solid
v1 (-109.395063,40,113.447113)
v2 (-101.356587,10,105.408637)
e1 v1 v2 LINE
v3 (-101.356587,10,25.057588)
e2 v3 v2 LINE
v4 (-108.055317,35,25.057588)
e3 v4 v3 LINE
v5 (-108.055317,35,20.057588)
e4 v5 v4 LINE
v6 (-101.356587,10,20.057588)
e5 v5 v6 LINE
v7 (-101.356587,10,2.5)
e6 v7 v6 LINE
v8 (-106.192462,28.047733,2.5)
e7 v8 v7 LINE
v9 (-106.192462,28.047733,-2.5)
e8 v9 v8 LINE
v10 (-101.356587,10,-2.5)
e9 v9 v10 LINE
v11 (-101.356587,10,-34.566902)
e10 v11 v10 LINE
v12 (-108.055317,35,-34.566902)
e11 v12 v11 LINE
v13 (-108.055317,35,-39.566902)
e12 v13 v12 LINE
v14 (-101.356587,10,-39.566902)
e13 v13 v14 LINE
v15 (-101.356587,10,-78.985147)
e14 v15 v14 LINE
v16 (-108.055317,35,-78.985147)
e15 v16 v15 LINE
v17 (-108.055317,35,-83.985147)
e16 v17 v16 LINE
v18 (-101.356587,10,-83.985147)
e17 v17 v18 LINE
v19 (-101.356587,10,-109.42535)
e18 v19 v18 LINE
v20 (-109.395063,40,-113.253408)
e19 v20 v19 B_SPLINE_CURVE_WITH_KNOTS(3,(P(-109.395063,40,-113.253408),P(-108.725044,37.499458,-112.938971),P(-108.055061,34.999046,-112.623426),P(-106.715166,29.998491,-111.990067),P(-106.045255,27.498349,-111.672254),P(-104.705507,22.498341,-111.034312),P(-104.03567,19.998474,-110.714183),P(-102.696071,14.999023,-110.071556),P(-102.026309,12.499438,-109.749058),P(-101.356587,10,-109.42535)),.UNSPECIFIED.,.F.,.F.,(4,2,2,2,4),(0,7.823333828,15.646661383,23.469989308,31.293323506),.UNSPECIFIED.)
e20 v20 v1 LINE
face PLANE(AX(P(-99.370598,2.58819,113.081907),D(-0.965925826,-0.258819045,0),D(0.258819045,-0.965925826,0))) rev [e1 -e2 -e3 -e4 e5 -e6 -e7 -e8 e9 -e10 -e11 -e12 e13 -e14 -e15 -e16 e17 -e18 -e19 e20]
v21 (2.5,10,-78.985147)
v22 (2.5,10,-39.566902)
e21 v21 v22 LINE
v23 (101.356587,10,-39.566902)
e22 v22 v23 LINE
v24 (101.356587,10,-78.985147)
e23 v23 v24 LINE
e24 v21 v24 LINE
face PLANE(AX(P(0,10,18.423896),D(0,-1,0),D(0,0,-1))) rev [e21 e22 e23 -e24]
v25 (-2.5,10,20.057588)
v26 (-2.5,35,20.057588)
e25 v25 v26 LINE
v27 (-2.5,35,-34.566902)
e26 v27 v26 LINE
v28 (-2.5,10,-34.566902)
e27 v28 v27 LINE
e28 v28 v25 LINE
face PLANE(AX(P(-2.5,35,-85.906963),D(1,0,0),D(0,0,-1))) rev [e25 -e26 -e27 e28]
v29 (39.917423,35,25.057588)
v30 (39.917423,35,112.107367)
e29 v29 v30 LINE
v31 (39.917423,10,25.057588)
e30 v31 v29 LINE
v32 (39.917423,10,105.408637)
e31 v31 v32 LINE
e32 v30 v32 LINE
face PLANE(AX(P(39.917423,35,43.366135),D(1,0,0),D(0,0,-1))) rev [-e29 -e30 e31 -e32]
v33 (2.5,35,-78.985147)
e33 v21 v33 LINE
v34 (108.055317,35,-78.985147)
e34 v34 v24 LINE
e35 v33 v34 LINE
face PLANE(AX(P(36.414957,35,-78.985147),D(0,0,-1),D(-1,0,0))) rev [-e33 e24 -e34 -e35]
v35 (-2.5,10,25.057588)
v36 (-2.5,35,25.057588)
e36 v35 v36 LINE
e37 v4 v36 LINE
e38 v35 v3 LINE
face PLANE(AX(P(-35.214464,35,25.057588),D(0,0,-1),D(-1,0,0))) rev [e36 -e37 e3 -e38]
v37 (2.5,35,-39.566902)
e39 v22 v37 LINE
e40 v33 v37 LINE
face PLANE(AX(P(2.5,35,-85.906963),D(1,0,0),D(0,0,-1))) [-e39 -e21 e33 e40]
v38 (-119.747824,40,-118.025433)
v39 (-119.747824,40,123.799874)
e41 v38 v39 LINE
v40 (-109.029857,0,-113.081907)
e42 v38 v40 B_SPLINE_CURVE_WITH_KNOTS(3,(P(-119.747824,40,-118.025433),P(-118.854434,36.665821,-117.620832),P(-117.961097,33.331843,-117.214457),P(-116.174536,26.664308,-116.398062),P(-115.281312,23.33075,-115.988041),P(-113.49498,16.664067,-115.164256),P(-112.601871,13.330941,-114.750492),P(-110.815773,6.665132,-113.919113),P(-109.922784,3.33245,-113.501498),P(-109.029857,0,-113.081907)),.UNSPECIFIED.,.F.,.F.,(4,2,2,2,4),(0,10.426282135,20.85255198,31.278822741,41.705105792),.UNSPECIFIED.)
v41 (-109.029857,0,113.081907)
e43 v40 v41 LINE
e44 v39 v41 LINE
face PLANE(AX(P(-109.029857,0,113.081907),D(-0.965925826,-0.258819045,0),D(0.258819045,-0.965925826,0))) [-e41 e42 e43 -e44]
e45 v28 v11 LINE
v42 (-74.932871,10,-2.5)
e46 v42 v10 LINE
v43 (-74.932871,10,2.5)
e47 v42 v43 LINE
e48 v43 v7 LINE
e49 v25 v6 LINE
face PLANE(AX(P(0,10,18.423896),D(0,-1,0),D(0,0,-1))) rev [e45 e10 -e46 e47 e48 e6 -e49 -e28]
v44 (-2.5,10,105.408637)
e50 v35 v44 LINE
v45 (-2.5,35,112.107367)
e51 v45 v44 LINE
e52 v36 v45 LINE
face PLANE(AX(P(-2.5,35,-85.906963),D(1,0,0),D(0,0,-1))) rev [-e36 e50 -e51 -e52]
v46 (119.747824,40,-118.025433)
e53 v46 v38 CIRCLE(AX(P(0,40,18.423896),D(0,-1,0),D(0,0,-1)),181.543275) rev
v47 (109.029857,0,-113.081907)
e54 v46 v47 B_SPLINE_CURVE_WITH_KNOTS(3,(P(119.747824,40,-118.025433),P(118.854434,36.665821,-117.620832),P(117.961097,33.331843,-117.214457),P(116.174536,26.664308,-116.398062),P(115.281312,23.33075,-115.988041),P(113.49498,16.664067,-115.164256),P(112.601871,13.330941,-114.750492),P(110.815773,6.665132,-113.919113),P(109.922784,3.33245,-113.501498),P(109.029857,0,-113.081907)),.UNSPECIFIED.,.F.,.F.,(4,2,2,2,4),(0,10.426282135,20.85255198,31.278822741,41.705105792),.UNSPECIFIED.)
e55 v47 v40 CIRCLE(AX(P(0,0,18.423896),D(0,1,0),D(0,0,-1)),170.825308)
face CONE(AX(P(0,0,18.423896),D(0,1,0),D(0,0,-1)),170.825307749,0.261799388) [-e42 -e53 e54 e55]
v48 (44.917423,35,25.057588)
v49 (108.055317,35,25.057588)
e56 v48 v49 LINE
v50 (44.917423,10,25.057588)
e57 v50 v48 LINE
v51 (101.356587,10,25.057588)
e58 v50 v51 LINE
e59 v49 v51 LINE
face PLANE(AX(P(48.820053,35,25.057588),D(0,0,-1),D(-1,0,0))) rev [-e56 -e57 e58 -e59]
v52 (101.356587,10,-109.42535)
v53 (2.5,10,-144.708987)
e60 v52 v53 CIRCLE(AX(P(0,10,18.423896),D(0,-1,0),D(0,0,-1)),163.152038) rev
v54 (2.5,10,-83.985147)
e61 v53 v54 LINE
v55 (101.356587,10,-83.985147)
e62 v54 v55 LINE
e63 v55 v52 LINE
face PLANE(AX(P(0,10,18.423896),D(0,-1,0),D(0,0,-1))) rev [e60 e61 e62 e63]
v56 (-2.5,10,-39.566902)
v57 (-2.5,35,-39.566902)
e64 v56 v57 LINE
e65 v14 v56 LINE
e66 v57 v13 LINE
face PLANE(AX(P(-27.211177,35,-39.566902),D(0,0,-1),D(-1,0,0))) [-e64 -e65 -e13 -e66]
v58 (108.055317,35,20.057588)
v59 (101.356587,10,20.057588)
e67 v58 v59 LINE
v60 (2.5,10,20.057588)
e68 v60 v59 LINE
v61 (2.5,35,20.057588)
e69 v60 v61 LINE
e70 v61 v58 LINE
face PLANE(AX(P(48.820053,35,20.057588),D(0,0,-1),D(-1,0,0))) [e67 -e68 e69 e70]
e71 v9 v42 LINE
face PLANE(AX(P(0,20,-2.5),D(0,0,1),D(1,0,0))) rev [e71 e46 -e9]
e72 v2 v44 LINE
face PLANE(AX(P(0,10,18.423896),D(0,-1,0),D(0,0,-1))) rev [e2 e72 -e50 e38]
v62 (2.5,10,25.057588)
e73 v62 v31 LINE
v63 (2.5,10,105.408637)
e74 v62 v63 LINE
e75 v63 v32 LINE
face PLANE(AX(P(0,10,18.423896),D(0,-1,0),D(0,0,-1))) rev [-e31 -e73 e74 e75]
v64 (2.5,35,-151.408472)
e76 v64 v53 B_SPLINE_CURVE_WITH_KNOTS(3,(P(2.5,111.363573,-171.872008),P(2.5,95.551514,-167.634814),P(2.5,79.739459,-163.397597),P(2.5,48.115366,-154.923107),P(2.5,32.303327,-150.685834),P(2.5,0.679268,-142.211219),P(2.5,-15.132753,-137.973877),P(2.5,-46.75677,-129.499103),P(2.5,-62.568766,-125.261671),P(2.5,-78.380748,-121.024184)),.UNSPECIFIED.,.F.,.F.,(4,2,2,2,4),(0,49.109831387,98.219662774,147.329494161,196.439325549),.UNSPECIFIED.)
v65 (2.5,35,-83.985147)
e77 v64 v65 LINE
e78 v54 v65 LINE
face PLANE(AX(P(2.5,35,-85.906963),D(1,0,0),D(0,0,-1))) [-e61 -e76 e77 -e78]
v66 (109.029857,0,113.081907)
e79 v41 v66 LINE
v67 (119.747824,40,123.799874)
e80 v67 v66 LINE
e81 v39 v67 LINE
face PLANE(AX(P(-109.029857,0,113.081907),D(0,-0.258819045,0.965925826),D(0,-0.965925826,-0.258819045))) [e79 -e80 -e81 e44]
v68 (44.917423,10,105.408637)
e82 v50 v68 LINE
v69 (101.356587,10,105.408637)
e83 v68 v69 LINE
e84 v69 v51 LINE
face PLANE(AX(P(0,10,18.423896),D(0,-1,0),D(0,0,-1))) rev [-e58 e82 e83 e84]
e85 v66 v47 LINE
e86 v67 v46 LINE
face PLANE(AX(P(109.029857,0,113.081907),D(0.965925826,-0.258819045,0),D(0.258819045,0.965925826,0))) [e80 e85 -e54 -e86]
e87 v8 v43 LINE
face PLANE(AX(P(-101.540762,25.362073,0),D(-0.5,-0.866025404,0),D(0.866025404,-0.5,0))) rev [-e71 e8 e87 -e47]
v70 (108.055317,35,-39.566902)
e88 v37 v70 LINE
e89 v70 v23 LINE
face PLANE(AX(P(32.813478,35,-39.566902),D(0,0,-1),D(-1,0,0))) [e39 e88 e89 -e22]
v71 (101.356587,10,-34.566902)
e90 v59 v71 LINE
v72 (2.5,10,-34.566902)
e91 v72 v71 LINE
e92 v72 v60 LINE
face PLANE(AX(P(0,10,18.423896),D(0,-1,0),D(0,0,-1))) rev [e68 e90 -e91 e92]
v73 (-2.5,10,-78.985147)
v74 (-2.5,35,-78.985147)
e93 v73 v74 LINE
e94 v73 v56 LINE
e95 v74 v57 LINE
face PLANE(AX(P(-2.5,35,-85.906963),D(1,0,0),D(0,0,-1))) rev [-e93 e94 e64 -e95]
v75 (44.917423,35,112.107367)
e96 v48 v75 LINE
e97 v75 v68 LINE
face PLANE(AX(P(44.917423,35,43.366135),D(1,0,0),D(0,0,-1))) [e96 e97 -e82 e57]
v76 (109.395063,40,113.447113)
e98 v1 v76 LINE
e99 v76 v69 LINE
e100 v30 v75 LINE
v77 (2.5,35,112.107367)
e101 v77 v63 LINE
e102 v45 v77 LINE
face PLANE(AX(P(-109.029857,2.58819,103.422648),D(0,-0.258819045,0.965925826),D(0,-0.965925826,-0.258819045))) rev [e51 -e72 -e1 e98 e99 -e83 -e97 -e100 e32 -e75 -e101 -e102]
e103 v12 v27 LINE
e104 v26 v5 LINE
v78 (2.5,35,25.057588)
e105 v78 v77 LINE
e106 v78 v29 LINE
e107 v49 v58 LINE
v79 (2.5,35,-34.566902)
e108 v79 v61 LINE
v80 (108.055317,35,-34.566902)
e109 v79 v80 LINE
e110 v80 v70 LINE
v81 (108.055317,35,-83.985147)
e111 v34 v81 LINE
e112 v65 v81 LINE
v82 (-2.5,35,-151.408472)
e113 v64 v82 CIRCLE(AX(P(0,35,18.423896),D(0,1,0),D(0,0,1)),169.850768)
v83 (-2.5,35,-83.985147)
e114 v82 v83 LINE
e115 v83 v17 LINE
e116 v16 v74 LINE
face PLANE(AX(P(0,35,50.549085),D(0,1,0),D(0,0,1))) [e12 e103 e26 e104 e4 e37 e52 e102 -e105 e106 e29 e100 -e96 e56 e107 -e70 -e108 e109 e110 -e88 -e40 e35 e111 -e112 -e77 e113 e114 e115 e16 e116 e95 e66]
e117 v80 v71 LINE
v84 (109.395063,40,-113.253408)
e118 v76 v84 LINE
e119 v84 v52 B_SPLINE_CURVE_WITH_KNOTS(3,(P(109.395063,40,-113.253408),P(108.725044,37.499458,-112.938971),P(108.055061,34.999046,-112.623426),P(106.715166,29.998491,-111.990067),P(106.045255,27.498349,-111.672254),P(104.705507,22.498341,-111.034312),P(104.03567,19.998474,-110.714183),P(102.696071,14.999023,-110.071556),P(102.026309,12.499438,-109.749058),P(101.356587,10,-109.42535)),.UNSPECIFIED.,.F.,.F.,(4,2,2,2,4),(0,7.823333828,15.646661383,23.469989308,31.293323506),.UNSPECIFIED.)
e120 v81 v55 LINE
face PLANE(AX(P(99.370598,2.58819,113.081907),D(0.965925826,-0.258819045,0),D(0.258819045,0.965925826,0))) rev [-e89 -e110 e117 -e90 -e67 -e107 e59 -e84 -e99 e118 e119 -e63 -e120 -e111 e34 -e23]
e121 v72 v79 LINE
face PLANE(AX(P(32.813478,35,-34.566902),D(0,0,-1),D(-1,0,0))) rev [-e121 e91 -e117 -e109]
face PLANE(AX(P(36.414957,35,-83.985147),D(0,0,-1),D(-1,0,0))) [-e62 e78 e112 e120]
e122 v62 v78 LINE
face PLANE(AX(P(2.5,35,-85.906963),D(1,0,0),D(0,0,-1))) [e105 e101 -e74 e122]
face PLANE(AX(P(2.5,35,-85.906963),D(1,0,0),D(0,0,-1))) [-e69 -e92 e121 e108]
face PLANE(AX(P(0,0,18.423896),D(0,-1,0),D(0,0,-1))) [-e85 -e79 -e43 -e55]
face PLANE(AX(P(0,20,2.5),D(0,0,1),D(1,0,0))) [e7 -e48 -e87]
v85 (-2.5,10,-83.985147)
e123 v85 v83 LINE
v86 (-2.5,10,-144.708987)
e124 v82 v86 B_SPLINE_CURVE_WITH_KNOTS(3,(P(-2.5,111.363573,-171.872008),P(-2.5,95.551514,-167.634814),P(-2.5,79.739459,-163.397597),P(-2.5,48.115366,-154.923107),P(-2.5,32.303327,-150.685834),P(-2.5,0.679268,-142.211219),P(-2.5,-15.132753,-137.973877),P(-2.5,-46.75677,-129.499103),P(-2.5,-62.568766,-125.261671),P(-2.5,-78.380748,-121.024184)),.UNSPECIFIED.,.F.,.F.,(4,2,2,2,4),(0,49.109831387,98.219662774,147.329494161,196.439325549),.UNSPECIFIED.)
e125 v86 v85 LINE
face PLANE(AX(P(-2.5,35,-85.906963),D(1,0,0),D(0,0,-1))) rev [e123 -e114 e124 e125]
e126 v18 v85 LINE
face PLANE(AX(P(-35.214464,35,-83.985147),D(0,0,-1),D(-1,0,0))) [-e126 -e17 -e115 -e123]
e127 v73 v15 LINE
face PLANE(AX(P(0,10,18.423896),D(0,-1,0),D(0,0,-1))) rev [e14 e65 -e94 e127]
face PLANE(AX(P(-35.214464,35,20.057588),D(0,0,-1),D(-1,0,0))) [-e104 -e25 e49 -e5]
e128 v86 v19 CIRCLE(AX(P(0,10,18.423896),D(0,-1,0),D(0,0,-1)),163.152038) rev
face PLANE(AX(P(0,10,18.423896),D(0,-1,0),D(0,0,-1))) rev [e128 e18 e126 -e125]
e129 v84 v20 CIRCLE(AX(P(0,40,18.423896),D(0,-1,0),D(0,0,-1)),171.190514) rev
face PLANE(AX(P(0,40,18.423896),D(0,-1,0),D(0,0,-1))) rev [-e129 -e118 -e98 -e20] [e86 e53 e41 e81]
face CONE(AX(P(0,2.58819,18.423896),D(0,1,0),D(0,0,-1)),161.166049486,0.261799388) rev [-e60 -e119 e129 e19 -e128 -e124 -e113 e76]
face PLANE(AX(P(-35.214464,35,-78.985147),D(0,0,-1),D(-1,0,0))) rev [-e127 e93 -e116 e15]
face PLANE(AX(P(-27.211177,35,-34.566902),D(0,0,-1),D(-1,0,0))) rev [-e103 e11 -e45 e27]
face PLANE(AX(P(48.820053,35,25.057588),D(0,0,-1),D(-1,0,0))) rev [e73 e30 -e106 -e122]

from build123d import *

# Parameters (mm, degrees)
BOSS_EXTRUDE1_DEPTH = 40
BOSS_EXTRUDE1_DRAFT = -15
SHELL1_T            = -10
RIB7_REACH          = 207.359
SKETCH5_WALLS_W     = 5
SKETCH5_WALLS_H     = 549.174801164
SKETCH5_WALLS_W_2   = 496.753269208
SKETCH5_WALLS_H_2   = 5
SKETCH5_WALLS_W_3   = 472.743407243
SKETCH5_WALLS_W_4   = 484.34817386
RIB8_REACH          = 207.359
SKETCH6_WALLS_W     = 5
SKETCH6_WALLS_H     = 444.331737252
RIB9_REACH          = 208.27
SKETCH7_WALL_W      = 435.628467694
SKETCH7_WALL_H      = 5


with BuildPart() as part:
    # Sketch1 → Boss-Extrude1 (with draft: the straight prism first)
    with BuildSketch(Plane(origin=(0, 0, 0), x_dir=(1, 0, 0), z_dir=(0, 1, 0))):
        with BuildLine():
            Line((-109.029856613, -113.081906669), (109.029856613, -113.081906669))
            Line((109.029856613, -113.081906669), (109.029856613, 113.081906669))
            ThreePointArc((109.029856613, 113.081906669), (0, 152.401411753), (-109.029856613, 113.081906669))
            Line((-109.029856613, 113.081906669), (-109.029856613, -113.081906669))
        make_face()
    extrude(amount=BOSS_EXTRUDE1_DEPTH)
    # Boss-Extrude1: the draft: its side faces are tilted about the plane it starts from
    boss_extrude1_sides = [part.faces().sort_by_distance(p)[0] for p in [
        (0, 20, 113.081906669),
        (109.029856613, 20, 0),
        (0, 20, -152.401411753),
        (-109.029856613, 20, 0),
    ]]
    draft(boss_extrude1_sides, Plane(origin=(0, 0, 0), x_dir=(1, 0, 0), z_dir=(0, 1, 0)), BOSS_EXTRUDE1_DRAFT)

    # Shell1
    shell1_openings = [part.faces().sort_by_distance(p)[0] for p in [
        (0, 40, -12.878837242),
    ]]
    offset(amount=SHELL1_T, openings=shell1_openings, kind=Kind.INTERSECTION)

    # Sketch5 walls → Rib7 (add, up to next)
    with BuildSketch(Plane(origin=(0, 35, 0), x_dir=(1, 0, 0), z_dir=(0, 1, 0)), mode=Mode.PRIVATE) as rib7_sk1:
        with Locations((0, 17.67893893)):
            Rectangle(SKETCH5_WALLS_W, SKETCH5_WALLS_H)
    rib7_tool1 = extrude(rib7_sk1.sketch, amount=-RIB7_REACH, mode=Mode.PRIVATE) - part.part
    # Sketch5 walls → Rib7 (add, up to next)
    with BuildSketch(Plane(origin=(0, 35, 0), x_dir=(1, 0, 0), z_dir=(0, 1, 0)), mode=Mode.PRIVATE) as rib7_sk2:
        with Locations((6.802794223, -22.557588079)):
            Rectangle(SKETCH5_WALLS_W_2, SKETCH5_WALLS_H_2)
    rib7_tool2 = extrude(rib7_sk2.sketch, amount=-RIB7_REACH, mode=Mode.PRIVATE) - part.part
    # Sketch5 walls → Rib7 (add, up to next)
    with BuildSketch(Plane(origin=(0, 35, 0), x_dir=(1, 0, 0), z_dir=(0, 1, 0)), mode=Mode.PRIVATE) as rib7_sk3:
        with Locations((2.801150562, 37.066902466)):
            Rectangle(SKETCH5_WALLS_W_3, SKETCH5_WALLS_H_2)
    rib7_tool3 = extrude(rib7_sk3.sketch, amount=-RIB7_REACH, mode=Mode.PRIVATE) - part.part
    # Sketch5 walls → Rib7 (add, up to next)
    with BuildSketch(Plane(origin=(0, 35, 0), x_dir=(1, 0, 0), z_dir=(0, 1, 0)), mode=Mode.PRIVATE) as rib7_sk4:
        with Locations((0.600246549, 81.485147101)):
            Rectangle(SKETCH5_WALLS_W_4, SKETCH5_WALLS_H_2)
    rib7_tool4 = extrude(rib7_sk4.sketch, amount=-RIB7_REACH, mode=Mode.PRIVATE) - part.part
    add(rib7_tool1.solids().sort_by_distance((0, 35, -17.67893893))[0])
    add(rib7_tool2.solids().sort_by_distance((6.802794223, 35, 22.557588079))[0])
    add(rib7_tool3.solids().sort_by_distance((2.801150563, 35, -37.066902466))[0])
    add(rib7_tool4.solids().sort_by_distance((0.600246549, 35, -81.485147101))[0])

    # Sketch6 walls → Rib8 (add, up to next)
    with BuildSketch(Plane(origin=(0, 35, 0), x_dir=(1, 0, 0), z_dir=(0, 1, 0)), mode=Mode.PRIVATE) as rib8_sk1:
        with Locations((42.417422804, -59.172627575)):
            Rectangle(SKETCH6_WALLS_W, SKETCH6_WALLS_H)
    rib8_tool1 = extrude(rib8_sk1.sketch, amount=-RIB8_REACH, mode=Mode.PRIVATE) - part.part
    add(rib8_tool1.solids().sort_by_distance((42.417422804, 35, 59.172627575))[0])

    # Sketch7 wall → Rib9 (add, up to next)
    with BuildSketch(Plane(origin=(-92.409524808, 20.0901507, 0), x_dir=(0.866025403797, -0.499999999978, 0), z_dir=(0.499999999978, 0.866025403797, 0)), mode=Mode.PRIVATE) as rib9_sk1:
        Rectangle(SKETCH7_WALL_W, SKETCH7_WALL_H)
    rib9_tool1 = extrude(rib9_sk1.sketch, amount=-RIB9_REACH, mode=Mode.PRIVATE) - part.part
    add(rib9_tool1.solids().sort_by_distance((-92.409524808, 20.0901507, 0))[0])


solid = part.part
